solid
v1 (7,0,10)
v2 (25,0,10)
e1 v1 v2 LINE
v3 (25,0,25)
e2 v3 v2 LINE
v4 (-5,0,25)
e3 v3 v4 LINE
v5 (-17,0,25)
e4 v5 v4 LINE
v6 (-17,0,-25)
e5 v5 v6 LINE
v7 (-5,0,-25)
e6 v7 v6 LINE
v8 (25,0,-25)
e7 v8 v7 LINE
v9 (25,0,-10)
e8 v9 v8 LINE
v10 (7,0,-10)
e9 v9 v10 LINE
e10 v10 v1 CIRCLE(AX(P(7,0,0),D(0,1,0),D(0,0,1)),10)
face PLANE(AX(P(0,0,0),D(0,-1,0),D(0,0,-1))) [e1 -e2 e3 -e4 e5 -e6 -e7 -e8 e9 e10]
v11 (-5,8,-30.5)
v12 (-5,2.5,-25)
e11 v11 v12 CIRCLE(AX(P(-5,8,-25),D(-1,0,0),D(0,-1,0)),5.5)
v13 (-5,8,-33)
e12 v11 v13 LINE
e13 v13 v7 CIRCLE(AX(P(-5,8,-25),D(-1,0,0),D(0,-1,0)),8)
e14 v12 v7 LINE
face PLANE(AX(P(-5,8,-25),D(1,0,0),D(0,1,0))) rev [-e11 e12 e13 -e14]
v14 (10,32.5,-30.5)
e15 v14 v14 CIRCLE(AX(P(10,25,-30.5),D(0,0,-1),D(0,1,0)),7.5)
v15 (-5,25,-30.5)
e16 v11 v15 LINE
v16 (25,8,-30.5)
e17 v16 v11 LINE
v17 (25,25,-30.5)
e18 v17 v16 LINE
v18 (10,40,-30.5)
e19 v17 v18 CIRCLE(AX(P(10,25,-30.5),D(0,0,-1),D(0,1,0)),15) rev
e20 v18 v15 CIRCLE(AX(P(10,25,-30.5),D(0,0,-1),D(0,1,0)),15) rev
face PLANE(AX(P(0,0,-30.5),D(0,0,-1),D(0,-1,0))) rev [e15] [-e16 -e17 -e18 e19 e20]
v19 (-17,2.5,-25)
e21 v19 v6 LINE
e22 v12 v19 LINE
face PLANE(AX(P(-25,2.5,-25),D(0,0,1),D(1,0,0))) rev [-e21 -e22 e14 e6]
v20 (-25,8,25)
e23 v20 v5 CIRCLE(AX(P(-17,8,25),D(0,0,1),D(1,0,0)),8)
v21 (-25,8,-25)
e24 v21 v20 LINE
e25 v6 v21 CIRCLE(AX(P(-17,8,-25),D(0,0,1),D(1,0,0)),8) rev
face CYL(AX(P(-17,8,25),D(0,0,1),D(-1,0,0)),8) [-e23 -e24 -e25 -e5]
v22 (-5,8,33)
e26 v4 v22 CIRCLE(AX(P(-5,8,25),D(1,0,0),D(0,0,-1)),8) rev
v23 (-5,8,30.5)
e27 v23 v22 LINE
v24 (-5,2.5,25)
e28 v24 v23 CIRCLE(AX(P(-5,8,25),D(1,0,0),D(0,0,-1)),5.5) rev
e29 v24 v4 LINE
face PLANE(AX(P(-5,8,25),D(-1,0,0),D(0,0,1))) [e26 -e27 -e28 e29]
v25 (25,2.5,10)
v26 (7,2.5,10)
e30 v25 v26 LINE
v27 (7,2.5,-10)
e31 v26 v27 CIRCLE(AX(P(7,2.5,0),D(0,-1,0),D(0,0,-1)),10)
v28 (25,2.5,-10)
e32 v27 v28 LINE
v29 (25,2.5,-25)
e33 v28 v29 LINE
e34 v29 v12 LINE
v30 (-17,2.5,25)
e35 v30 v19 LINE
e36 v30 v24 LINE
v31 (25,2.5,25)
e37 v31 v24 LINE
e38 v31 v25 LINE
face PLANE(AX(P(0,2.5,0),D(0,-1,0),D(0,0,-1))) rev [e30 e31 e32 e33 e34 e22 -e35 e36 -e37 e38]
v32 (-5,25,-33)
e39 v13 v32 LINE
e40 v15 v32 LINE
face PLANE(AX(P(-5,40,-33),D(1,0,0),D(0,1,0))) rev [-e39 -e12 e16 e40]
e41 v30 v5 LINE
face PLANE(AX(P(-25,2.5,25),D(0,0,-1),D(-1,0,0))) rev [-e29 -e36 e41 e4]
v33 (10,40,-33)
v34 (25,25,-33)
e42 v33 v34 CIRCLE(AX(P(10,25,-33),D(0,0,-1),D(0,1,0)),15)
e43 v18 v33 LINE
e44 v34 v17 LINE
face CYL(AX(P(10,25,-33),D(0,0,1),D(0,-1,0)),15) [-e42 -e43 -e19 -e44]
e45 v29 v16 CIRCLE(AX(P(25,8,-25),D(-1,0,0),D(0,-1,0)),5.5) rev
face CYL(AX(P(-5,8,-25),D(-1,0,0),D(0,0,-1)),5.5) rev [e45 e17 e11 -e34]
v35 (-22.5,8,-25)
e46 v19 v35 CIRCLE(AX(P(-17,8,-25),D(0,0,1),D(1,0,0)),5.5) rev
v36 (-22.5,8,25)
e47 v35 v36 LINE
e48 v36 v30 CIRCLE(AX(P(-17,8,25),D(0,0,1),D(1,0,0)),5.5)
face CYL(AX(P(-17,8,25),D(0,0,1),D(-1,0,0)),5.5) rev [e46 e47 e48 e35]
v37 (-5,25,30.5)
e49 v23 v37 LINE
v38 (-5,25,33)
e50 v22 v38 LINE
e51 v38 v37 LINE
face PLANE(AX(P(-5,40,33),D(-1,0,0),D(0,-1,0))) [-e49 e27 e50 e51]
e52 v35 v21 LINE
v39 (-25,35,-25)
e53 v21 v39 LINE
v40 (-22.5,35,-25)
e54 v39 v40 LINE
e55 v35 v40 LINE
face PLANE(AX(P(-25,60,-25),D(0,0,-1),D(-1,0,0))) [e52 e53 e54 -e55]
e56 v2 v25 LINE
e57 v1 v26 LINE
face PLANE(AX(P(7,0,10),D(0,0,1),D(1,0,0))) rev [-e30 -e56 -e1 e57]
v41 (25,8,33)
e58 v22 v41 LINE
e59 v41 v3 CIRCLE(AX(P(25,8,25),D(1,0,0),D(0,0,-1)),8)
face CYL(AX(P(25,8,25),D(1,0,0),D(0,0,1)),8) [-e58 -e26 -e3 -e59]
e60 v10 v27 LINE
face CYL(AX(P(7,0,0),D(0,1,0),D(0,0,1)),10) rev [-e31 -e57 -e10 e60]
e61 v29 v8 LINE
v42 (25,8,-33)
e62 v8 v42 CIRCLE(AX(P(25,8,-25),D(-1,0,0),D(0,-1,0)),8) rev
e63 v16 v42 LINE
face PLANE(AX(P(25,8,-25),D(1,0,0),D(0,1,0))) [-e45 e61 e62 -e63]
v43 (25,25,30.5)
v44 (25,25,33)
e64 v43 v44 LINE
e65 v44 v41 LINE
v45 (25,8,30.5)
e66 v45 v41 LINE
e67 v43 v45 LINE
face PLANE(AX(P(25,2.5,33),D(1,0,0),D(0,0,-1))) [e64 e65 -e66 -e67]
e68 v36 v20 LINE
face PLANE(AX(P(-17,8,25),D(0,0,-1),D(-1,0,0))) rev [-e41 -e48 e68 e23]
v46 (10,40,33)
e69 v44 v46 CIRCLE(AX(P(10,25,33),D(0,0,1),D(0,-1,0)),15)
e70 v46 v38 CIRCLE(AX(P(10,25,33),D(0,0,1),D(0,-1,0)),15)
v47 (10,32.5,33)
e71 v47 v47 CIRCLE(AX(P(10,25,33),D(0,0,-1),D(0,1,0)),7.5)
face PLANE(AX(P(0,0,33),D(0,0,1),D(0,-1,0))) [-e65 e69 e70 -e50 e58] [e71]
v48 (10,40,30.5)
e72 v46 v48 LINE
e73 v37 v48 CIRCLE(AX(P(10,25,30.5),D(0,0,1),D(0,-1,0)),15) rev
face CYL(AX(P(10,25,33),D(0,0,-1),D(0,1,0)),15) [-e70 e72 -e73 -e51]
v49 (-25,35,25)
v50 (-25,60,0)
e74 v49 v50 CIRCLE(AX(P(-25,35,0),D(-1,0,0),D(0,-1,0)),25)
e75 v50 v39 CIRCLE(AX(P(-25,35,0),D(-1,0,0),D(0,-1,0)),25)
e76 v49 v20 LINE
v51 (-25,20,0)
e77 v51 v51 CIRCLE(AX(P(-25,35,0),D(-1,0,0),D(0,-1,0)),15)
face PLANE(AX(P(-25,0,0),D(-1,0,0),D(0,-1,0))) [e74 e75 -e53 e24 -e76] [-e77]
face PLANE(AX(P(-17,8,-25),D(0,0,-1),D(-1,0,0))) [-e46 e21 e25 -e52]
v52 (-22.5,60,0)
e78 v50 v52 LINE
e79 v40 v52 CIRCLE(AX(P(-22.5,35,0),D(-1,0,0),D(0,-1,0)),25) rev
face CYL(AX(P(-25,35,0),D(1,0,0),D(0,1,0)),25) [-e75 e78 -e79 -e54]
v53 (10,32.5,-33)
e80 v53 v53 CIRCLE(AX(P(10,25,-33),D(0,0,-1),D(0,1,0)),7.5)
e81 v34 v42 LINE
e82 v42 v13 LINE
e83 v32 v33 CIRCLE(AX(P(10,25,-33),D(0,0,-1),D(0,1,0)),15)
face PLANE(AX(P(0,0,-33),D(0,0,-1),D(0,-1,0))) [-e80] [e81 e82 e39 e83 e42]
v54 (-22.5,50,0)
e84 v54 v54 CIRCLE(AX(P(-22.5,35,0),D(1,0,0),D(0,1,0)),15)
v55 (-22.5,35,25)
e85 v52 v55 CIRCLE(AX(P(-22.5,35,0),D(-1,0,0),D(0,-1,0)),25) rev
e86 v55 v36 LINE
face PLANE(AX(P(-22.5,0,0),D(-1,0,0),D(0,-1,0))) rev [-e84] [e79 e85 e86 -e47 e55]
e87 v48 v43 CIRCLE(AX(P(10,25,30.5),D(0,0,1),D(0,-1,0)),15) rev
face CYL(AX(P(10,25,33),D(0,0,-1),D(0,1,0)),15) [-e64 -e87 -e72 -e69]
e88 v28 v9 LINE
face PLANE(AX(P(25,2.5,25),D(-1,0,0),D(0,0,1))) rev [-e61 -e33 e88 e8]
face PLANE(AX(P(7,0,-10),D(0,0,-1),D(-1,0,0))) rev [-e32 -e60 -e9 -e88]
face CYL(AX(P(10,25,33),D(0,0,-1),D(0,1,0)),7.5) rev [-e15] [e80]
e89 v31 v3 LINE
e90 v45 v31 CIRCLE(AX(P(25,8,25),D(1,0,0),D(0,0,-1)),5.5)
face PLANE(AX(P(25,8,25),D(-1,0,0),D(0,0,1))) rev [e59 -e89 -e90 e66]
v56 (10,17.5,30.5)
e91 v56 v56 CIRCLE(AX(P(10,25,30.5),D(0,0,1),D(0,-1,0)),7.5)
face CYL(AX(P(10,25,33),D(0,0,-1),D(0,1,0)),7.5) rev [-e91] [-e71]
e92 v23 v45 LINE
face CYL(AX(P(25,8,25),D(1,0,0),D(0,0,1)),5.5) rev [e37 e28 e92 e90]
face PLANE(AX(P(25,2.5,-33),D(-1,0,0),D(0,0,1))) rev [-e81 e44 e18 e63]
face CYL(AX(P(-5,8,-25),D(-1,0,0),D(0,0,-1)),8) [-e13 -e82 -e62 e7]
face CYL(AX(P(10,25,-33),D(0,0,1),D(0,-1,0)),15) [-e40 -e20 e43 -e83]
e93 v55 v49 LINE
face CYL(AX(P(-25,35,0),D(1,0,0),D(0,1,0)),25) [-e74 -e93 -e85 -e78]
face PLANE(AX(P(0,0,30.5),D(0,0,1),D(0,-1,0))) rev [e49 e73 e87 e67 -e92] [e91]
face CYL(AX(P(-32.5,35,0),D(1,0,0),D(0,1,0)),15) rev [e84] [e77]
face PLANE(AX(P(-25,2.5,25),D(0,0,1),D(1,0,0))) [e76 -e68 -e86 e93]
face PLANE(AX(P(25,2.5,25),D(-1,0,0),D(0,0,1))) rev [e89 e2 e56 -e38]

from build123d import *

# Parameters (mm, degrees)
SKETCH1_W                    = 50
SKETCH1_H                    = 50
BASE_FLANGE1_DEPTH           = 2.5
EDGE_FLANGE1_STRIP_W         = 21
EDGE_FLANGE1_STRIP_H         = 2.5
EDGE_FLANGE1_STRIP_CUT_DEPTH = 50
EDGE_FLANGE1_DEPTH           = 50
BREAK_CORNER1_START          = -25
BREAK_CORNER1_DEPTH          = 2.5
SKETCH9_R                    = 15
CUT_EXTRUDE1_DEPTH           = 10
EDGE_FLANGE2_DEPTH           = 30
BREAK_CORNER2_START          = -33
BREAK_CORNER2_DEPTH          = 66
CUT_EXTRUDE2_DEPTH           = 93.633687177
CUT_EXTRUDE2_DEPTH_BACK      = 93.633687177
SKETCH13_R                   = 7.5
CUT_EXTRUDE3_DEPTH           = 71.853722556
CUT_EXTRUDE3_DEPTH_BACK      = 71.853722556


# Read off the part's stored shape, not the designer's step: Break-Corner1, Break-Corner2
# Sheet-metal steps are written as plain solids
with BuildPart() as part:
    # Sketch1 → Base-Flange1 (new body)
    with BuildSketch(Plane(origin=(0, 0, 0), x_dir=(1, 0, 0), z_dir=(0, 1, 0))):
        Rectangle(SKETCH1_W, SKETCH1_H)
    extrude(amount=BASE_FLANGE1_DEPTH)

    # Edge-Flange1 strip (across the edge) → Edge-Flange1 strip cut (cut)
    with BuildSketch(Plane(origin=(-25, 2.5, -25), x_dir=(1, 0, 0), z_dir=(0, 0, 1))):
        with Locations((-2.5, -1.25)):
            Rectangle(EDGE_FLANGE1_STRIP_W, EDGE_FLANGE1_STRIP_H)
    extrude(amount=EDGE_FLANGE1_STRIP_CUT_DEPTH, mode=Mode.SUBTRACT)

    # Edge-Flange1 section (across the edge) → Edge-Flange1 (add)
    with BuildSketch(Plane(origin=(-25, 2.5, -25), x_dir=(1, 0, 0), z_dir=(0, 0, 1))):
        with BuildLine():
            Line((0, 5.5), (0, 57.5))
            Line((0, 57.5), (2.5, 57.5))
            Line((2.5, 57.5), (2.5, 5.5))
            ThreePointArc((2.5, 5.5), (4.110912703, 1.610912703), (8, 0))
            Line((8, 0), (8, -2.5))
            ThreePointArc((8, -2.5), (2.343145751, -0.156854249), (0, 5.5))
        make_face()
    extrude(amount=EDGE_FLANGE1_DEPTH)

    # Break-Corner1 outline → Break-Corner1 (cut)
    with BuildSketch(Plane.YZ.offset(BREAK_CORNER1_START)):
        with BuildLine():
            Line((60, -25), (60, 0))
            ThreePointArc((60, 0), (52.67766953, -17.67766953), (35, -25))
            Line((35, -25), (60, -25))
        make_face()
        with BuildLine():
            ThreePointArc((35, 25), (52.67766953, 17.67766953), (60, 0))
            Line((60, 0), (60, 25))
            Line((60, 25), (35, 25))
        make_face()
    extrude(amount=BREAK_CORNER1_DEPTH, mode=Mode.SUBTRACT)

    # Sketch9 → Cut-Extrude1 (cut)
    with BuildSketch(Plane(origin=(-22.5, 0, 0), x_dir=(0, 0, -1), z_dir=(1, 0, 0))):
        with Locations(Location((0, 35, 0), (0, 0, 90))):
            Circle(SKETCH9_R)
    extrude(amount=-CUT_EXTRUDE1_DEPTH, mode=Mode.SUBTRACT)

    # Edge-Flange2 section (across the edge) → Edge-Flange2 (add)
    with BuildSketch(Plane(origin=(-5, 2.5, 30.5), x_dir=(0, 0, -1), z_dir=(1, 0, 0))):
        with BuildLine():
            Line((-2.5, 5.5), (-2.5, 37.5))
            Line((-2.5, 37.5), (0, 37.5))
            Line((0, 37.5), (0, 5.5))
            ThreePointArc((0, 5.5), (1.610912703, 1.610912703), (5.5, 0))
            Line((5.5, 0), (5.5, -2.5))
            ThreePointArc((5.5, -2.5), (-0.156854249, -0.156854249), (-2.5, 5.5))
        make_face()
    edge_flange2 = extrude(amount=EDGE_FLANGE2_DEPTH)

    # Mirror1: Edge-Flange2 across plane
    add(edge_flange2.mirror(Plane.XY))

    # Break-Corner2 outline → Break-Corner2 (cut)
    with BuildSketch(Plane.XY.offset(BREAK_CORNER2_START)):
        with BuildLine():
            ThreePointArc((-5, 25), (-0.606601718, 35.606601718), (10, 40))
            Line((10, 40), (-5, 40))
            Line((-5, 40), (-5, 25))
        make_face()
        with BuildLine():
            ThreePointArc((10, 40), (20.606601718, 35.606601718), (25, 25))
            Line((25, 25), (25, 40))
            Line((25, 40), (10, 40))
        make_face()
    extrude(amount=BREAK_CORNER2_DEPTH, mode=Mode.SUBTRACT)

    # Sketch13 → Cut-Extrude2 (cut, two sides: drawn at the far end of the back side and taken through both)
    with BuildSketch(Plane(origin=(0, 0, -33), x_dir=(-1, 0, 0), z_dir=(0, 0, -1)).offset(-CUT_EXTRUDE2_DEPTH_BACK)):
        with Locations(Location((-10, 25, 0), (0, 0, 90))):
            Circle(SKETCH13_R)
    extrude(amount=CUT_EXTRUDE2_DEPTH + CUT_EXTRUDE2_DEPTH_BACK, mode=Mode.SUBTRACT)

    # Sketch14 → Cut-Extrude3 (cut, two sides: drawn at the far end of the back side and taken through both)
    with BuildSketch(Plane(origin=(0, 2.5, 0), x_dir=(1, 0, 0), z_dir=(0, 1, 0)).offset(-CUT_EXTRUDE3_DEPTH_BACK)):
        with BuildLine():
            Line((7, 10), (37.302325581, 10))
            ThreePointArc((37.302325581, 10), (47.302325581, 0), (37.302325581, -10))
            Line((37.302325581, -10), (7, -10))
            ThreePointArc((7, -10), (-3, 0), (7, 10))
        make_face()
    extrude(amount=CUT_EXTRUDE3_DEPTH + CUT_EXTRUDE3_DEPTH_BACK, mode=Mode.SUBTRACT)


solid = part.part
